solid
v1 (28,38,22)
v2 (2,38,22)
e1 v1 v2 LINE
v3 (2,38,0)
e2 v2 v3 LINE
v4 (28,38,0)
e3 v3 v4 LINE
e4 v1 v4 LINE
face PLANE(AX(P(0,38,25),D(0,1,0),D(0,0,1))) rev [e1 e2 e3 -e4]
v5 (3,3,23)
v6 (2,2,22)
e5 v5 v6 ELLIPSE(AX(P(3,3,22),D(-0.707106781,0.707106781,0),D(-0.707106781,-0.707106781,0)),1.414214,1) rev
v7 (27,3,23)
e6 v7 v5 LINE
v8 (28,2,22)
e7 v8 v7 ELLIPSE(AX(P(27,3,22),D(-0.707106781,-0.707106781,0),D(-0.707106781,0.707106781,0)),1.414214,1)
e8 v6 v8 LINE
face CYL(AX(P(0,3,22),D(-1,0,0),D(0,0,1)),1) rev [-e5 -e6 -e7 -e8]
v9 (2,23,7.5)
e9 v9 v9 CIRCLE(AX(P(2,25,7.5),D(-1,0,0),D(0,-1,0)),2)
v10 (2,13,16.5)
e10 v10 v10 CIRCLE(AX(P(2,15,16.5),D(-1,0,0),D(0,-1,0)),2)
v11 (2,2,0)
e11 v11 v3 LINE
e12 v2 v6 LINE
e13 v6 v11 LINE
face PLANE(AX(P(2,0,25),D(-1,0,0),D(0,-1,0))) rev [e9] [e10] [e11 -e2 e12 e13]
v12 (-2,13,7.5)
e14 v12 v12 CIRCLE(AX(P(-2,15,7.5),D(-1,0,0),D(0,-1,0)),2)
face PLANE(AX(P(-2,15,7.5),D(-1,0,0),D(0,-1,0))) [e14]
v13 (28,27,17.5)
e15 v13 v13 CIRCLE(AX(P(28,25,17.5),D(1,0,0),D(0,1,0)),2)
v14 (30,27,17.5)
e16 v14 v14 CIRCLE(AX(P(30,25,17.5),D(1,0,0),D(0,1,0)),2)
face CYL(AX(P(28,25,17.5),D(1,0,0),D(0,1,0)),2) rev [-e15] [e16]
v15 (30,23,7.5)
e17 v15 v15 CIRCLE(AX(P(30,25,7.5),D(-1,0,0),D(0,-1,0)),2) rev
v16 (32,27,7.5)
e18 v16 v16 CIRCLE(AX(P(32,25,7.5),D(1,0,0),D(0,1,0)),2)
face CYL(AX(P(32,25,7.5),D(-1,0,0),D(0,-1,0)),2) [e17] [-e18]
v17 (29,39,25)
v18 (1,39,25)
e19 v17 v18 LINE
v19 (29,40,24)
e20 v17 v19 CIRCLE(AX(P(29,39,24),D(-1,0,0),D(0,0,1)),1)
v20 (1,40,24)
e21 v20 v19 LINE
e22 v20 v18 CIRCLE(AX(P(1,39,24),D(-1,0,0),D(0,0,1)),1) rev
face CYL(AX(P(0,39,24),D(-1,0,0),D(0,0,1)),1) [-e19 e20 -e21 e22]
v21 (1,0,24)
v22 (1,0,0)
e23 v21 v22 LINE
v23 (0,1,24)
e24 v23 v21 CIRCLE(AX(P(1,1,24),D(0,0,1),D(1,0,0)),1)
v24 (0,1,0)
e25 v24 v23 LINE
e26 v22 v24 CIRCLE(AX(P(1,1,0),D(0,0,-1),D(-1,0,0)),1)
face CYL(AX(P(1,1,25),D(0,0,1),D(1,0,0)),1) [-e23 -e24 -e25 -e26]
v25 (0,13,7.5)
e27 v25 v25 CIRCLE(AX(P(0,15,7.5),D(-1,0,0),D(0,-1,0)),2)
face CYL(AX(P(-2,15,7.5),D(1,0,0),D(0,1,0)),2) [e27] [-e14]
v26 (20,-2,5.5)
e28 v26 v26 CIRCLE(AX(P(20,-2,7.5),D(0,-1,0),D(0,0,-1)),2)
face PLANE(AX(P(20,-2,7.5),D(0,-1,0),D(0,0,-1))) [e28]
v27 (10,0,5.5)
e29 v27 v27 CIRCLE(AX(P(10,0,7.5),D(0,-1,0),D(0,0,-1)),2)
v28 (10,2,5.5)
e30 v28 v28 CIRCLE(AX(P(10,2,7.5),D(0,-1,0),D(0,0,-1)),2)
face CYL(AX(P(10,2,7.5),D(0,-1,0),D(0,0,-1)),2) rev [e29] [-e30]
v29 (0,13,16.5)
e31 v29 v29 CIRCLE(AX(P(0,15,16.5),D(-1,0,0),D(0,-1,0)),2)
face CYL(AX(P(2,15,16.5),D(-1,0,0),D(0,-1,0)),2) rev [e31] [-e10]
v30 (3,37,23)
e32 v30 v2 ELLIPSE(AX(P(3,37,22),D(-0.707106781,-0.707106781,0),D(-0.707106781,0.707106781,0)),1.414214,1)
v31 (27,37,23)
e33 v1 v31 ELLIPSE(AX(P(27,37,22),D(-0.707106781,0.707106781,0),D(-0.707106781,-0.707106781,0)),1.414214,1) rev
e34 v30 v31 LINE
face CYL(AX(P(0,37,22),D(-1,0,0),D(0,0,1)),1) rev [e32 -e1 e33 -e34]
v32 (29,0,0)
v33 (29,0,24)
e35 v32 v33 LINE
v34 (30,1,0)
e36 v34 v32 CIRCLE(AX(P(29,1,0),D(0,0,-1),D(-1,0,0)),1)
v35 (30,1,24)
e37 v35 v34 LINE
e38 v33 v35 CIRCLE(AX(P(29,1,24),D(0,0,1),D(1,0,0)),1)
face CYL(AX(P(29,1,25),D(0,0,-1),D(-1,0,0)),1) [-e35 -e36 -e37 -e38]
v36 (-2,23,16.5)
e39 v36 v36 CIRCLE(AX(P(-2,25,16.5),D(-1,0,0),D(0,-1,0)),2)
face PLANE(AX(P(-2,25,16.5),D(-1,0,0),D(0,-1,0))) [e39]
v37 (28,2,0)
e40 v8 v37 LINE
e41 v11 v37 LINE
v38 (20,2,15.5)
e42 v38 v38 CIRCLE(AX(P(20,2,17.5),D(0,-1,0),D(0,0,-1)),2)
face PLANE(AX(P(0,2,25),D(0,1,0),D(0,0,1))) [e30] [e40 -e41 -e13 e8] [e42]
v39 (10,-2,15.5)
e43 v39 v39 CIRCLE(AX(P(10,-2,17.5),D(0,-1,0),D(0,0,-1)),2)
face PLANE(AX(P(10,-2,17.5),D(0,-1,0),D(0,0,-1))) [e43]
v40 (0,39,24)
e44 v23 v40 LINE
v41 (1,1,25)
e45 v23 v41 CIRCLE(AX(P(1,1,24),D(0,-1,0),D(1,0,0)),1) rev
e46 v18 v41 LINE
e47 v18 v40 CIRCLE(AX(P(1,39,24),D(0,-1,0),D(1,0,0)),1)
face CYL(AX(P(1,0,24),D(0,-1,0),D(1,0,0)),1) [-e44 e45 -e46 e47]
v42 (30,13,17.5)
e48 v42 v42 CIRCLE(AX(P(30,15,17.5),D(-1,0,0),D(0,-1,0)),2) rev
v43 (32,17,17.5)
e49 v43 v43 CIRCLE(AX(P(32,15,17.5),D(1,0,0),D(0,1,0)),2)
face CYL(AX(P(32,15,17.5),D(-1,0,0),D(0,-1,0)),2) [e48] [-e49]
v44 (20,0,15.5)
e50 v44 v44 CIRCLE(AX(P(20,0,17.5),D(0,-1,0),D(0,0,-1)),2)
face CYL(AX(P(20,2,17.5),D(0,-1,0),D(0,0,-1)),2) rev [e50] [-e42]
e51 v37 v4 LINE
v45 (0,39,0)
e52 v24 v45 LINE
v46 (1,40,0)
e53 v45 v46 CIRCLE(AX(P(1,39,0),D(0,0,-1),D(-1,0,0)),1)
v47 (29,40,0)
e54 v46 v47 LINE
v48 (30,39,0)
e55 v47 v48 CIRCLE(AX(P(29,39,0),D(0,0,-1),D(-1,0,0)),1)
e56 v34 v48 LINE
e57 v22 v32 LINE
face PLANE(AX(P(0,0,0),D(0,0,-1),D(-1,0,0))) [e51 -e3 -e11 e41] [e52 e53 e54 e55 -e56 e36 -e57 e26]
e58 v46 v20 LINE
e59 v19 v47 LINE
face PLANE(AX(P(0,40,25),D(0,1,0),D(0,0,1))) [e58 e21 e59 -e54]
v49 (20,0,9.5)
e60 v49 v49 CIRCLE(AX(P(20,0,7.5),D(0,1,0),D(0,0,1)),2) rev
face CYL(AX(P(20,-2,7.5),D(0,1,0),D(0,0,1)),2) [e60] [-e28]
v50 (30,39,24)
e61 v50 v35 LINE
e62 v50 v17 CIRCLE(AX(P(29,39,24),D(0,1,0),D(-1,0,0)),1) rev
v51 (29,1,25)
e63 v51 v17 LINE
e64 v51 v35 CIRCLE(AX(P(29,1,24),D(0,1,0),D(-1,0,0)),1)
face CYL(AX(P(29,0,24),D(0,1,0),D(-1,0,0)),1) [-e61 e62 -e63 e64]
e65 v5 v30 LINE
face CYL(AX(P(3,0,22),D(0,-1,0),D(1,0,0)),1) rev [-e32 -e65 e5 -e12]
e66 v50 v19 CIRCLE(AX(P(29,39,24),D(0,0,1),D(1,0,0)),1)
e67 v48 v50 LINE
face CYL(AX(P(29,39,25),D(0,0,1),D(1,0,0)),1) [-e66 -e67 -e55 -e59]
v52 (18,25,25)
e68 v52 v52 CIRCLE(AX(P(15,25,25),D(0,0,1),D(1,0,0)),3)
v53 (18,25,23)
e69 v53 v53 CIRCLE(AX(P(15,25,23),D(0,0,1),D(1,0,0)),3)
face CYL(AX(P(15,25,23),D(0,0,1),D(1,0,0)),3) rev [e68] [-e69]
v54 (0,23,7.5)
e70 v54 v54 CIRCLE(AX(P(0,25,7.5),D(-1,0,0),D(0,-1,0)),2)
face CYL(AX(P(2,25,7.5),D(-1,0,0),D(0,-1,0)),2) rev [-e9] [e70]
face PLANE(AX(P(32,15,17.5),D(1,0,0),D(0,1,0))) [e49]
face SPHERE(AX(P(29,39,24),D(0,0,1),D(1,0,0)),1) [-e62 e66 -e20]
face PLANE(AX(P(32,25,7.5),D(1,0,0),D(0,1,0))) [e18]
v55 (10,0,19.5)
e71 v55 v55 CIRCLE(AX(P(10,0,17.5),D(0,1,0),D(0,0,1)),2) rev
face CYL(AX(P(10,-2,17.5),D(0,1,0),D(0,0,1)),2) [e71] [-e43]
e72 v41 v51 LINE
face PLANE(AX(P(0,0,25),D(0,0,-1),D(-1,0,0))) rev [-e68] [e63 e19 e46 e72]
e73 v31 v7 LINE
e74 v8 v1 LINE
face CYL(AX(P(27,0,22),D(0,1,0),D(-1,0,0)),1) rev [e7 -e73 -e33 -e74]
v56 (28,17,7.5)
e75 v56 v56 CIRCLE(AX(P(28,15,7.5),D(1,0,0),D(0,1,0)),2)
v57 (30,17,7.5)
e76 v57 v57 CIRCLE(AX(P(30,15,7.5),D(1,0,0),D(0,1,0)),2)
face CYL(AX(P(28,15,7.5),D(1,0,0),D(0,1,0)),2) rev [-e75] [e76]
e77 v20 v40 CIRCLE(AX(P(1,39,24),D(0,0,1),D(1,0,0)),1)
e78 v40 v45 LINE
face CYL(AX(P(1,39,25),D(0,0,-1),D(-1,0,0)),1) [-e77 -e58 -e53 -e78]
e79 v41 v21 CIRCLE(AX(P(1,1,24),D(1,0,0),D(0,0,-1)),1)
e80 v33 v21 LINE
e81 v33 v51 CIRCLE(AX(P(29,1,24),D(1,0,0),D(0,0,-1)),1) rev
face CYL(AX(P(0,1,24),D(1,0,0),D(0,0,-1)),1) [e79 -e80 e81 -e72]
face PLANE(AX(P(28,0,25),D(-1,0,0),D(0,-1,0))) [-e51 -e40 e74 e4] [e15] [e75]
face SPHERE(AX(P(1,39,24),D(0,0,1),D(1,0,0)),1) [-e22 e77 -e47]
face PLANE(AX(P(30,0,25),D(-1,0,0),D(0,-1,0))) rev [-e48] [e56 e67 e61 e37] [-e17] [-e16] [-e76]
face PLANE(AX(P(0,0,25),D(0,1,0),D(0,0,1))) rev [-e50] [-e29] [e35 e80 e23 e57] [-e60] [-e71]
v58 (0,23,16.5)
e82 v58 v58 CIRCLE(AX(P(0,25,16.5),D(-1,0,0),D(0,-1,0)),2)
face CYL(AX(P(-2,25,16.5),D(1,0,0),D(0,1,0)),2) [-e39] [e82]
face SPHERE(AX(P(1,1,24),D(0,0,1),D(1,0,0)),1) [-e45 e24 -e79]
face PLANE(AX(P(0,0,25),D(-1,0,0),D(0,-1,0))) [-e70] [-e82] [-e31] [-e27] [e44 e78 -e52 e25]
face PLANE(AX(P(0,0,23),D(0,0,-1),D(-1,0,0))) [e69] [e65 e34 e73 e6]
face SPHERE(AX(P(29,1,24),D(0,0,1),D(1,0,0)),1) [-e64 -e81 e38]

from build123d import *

# Parameters (mm, degrees)
SKETCH2_W           = 30
SKETCH2_H           = 40
BOSS_EXTRUDE2_DEPTH = 25
FILLET2_R           = 1
FILLET3_R           = 1
SHELL1_START        = 2
SHELL1_OUTLINE_W    = 36
SHELL1_OUTLINE_H    = 23
SHELL1_DEPTH        = 26
FILLET4_R           = 1
SKETCH5_R           = 2
CUT_EXTRUDE10_DEPTH = 2
SKETCH7_R           = 2
BOSS_EXTRUDE3_DEPTH = 2
SKETCH4_R           = 3
CUT_EXTRUDE11_DEPTH = 2
SKETCH8_R           = 2
BOSS_EXTRUDE5_DEPTH = 2
SKETCH9_R           = 2
CUT_EXTRUDE12_DEPTH = 2
SKETCH10_R          = 2
CUT_EXTRUDE13_DEPTH = 2
SKETCH11_R          = 2
BOSS_EXTRUDE6_DEPTH = 2


# Read off the part's stored shape, not the designer's step: Shell1
with BuildPart() as part:
    # Sketch2 → Boss-Extrude2 (new body)
    with BuildSketch(Plane.XY):
        with Locations((15, 20)):
            Rectangle(SKETCH2_W, SKETCH2_H)
    extrude(amount=BOSS_EXTRUDE2_DEPTH)

    # Fillet2
    fillet2_edges = [part.edges().sort_by_distance(p)[0] for p in [
        (30, 20, 25),
        (15, 0, 25),
        (0, 20, 25),
        (15, 40, 25),
    ]]
    fillet(fillet2_edges, radius=FILLET2_R)

    # Fillet3
    # the kernel refuses this fillet: 1 mm, written as the material it takes off along each edge
    with BuildSketch(Plane(origin=(1, 39, 24), x_dir=(0, 1, 0), z_dir=(-1, 0, 0))) as fillet3_piece_1_section:
        Polygon((0, 0), (FILLET3_R, 0), (FILLET3_R, -FILLET3_R), (0, -FILLET3_R), align=None)
    fillet3_piece_1 = extrude(amount=FILLET3_R, mode=Mode.PRIVATE)
    fillet3_piece_1 = fillet3_piece_1 - Plane(origin=(1, 39, 24), x_dir=(0, -0.7071067811865475, -0.7071067811865475), z_dir=(-1, 0, 0)) * Sphere(FILLET3_R, mode=Mode.PRIVATE)
    add(fillet3_piece_1, mode=Mode.SUBTRACT)
    with BuildSketch(Plane(origin=(29, 39, 24), x_dir=(0, 1, 0), z_dir=(1, 0, 0))) as fillet3_piece_2_section:
        Polygon((0, 0), (FILLET3_R, 0), (FILLET3_R, FILLET3_R), (0, FILLET3_R), align=None)
    fillet3_piece_2 = extrude(amount=FILLET3_R, mode=Mode.PRIVATE)
    fillet3_piece_2 = fillet3_piece_2 - Plane(origin=(29, 39, 24), x_dir=(0, -0.7071067811865475, -0.7071067811865475), z_dir=(1, 0, 0)) * Sphere(FILLET3_R, mode=Mode.PRIVATE)
    add(fillet3_piece_2, mode=Mode.SUBTRACT)
    with BuildSketch(Plane(origin=(1, 1, 24), x_dir=(-1, 0, 0), z_dir=(0, -1, 0))) as fillet3_piece_3_section:
        Polygon((0, 0), (FILLET3_R, 0), (FILLET3_R, -FILLET3_R), (0, -FILLET3_R), align=None)
    fillet3_piece_3 = extrude(amount=FILLET3_R, mode=Mode.PRIVATE)
    fillet3_piece_3 = fillet3_piece_3 - Plane(origin=(1, 1, 24), x_dir=(0.7071067811865475, 0, -0.7071067811865475), z_dir=(0, -1, 0)) * Sphere(FILLET3_R, mode=Mode.PRIVATE)
    add(fillet3_piece_3, mode=Mode.SUBTRACT)
    with BuildSketch(Plane(origin=(29, 1, 24), x_dir=(1, 0, 0), z_dir=(0, -1, 0))) as fillet3_piece_4_section:
        Polygon((0, 0), (FILLET3_R, 0), (FILLET3_R, FILLET3_R), (0, FILLET3_R), align=None)
    fillet3_piece_4 = extrude(amount=FILLET3_R, mode=Mode.PRIVATE)
    fillet3_piece_4 = fillet3_piece_4 - Plane(origin=(29, 1, 24), x_dir=(-0.7071067811865475, 0, -0.7071067811865475), z_dir=(0, -1, 0)) * Sphere(FILLET3_R, mode=Mode.PRIVATE)
    add(fillet3_piece_4, mode=Mode.SUBTRACT)
    with BuildSketch(Plane(origin=(30, 0, -2.5), x_dir=(-1, 0, 0), z_dir=(0, 0, 1)), Plane(origin=(30, 40, -2.5), x_dir=(0, -1, 0), z_dir=(0, 0, 1))) as fillet3_piece_5:
        with BuildLine():
            CenterArc((FILLET3_R, -FILLET3_R), FILLET3_R, 90, 90)
            Line((0, -FILLET3_R), (0, 0))
            Line((0, 0), (FILLET3_R, 0))
        make_face()
    extrude(amount=26.5, mode=Mode.SUBTRACT)
    with BuildSketch(Plane(origin=(0, 0, -2.5), x_dir=(1, 0, 0), z_dir=(0, 0, 1)), Plane(origin=(0, 40, -2.5), x_dir=(0, -1, 0), z_dir=(0, 0, 1))) as fillet3_piece_6:
        with BuildLine():
            CenterArc((FILLET3_R, FILLET3_R), FILLET3_R, 180, 90)
            Line((0, FILLET3_R), (0, 0))
            Line((0, 0), (FILLET3_R, 0))
        make_face()
    extrude(amount=26.5, mode=Mode.SUBTRACT)

    # Shell1 outline → Shell1 (cut)
    with BuildSketch(Plane.YZ.offset(SHELL1_START)):
        with Locations((20, 11.5)):
            Rectangle(SHELL1_OUTLINE_W, SHELL1_OUTLINE_H)
    extrude(amount=SHELL1_DEPTH, mode=Mode.SUBTRACT)

    # Fillet4
    fillet4_edges = [part.edges().sort_by_distance(p)[0] for p in [
        (28, 20, 23),
        (2, 20, 23),
        (15, 2, 23),
        (15, 38, 23),
    ]]
    fillet(fillet4_edges, radius=FILLET4_R)

    # Sketch5 → Cut-Extrude10 (cut)
    with BuildSketch(Plane.XZ):
        with Locations(Location((20, 17.5, 0), (0, 0, 270))):
            Circle(SKETCH5_R)
        with Locations(Location((10, 7.5, 0), (0, 0, 270))):
            Circle(SKETCH5_R)
    extrude(amount=-CUT_EXTRUDE10_DEPTH, mode=Mode.SUBTRACT)

    # Sketch7 → Boss-Extrude3 (add)
    with BuildSketch(Plane(origin=(0, 0, 0), x_dir=(-1, 0, 0), z_dir=(0, -1, 0))):
        with Locations(Location((-10, -17.5, 0), (0, 0, 270))):
            Circle(SKETCH7_R)
        with Locations(Location((-20, -7.5, 0), (0, 0, 270))):
            Circle(SKETCH7_R)
    extrude(amount=BOSS_EXTRUDE3_DEPTH)

    # Sketch4 → Cut-Extrude11 (cut)
    with BuildSketch(Plane.XY.offset(25)):
        with Locations((15, 25)):
            Circle(SKETCH4_R)
    extrude(amount=-CUT_EXTRUDE11_DEPTH, mode=Mode.SUBTRACT)

    # Sketch8 → Boss-Extrude5 (add)
    with BuildSketch(Plane(origin=(30, 0, 0), x_dir=(0, 0, -1), z_dir=(1, 0, 0))):
        with Locations(Location((-7.5, 25, 0), (0, 0, 270))):
            Circle(SKETCH8_R)
        with Locations(Location((-17.5, 15, 0), (0, 0, 270))):
            Circle(SKETCH8_R)
    extrude(amount=BOSS_EXTRUDE5_DEPTH)

    # Sketch9 → Cut-Extrude12 (cut)
    with BuildSketch(Plane(origin=(30, 0, 0), x_dir=(0, 0, -1), z_dir=(1, 0, 0))):
        with Locations(Location((-7.5, 15, 0), (0, 0, 90))):
            Circle(SKETCH9_R)
        with Locations(Location((-17.5, 25, 0), (0, 0, 90))):
            Circle(SKETCH9_R)
    extrude(amount=-CUT_EXTRUDE12_DEPTH, mode=Mode.SUBTRACT)

    # Sketch10 → Cut-Extrude13 (cut)
    with BuildSketch(Plane.ZY):
        with Locations(Location((7.5, 25, 0), (0, 0, 270))):
            Circle(SKETCH10_R)
        with Locations(Location((16.5, 15, 0), (0, 0, 270))):
            Circle(SKETCH10_R)
    extrude(amount=-CUT_EXTRUDE13_DEPTH, mode=Mode.SUBTRACT)

    # Sketch11 → Boss-Extrude6 (add)
    with BuildSketch(Plane.ZY):
        with Locations(Location((16.5, 25, 0), (0, 0, 270))):
            Circle(SKETCH11_R)
        with Locations(Location((7.5, 15, 0), (0, 0, 90))):
            Circle(SKETCH11_R)
    extrude(amount=BOSS_EXTRUDE6_DEPTH)


solid = part.part
